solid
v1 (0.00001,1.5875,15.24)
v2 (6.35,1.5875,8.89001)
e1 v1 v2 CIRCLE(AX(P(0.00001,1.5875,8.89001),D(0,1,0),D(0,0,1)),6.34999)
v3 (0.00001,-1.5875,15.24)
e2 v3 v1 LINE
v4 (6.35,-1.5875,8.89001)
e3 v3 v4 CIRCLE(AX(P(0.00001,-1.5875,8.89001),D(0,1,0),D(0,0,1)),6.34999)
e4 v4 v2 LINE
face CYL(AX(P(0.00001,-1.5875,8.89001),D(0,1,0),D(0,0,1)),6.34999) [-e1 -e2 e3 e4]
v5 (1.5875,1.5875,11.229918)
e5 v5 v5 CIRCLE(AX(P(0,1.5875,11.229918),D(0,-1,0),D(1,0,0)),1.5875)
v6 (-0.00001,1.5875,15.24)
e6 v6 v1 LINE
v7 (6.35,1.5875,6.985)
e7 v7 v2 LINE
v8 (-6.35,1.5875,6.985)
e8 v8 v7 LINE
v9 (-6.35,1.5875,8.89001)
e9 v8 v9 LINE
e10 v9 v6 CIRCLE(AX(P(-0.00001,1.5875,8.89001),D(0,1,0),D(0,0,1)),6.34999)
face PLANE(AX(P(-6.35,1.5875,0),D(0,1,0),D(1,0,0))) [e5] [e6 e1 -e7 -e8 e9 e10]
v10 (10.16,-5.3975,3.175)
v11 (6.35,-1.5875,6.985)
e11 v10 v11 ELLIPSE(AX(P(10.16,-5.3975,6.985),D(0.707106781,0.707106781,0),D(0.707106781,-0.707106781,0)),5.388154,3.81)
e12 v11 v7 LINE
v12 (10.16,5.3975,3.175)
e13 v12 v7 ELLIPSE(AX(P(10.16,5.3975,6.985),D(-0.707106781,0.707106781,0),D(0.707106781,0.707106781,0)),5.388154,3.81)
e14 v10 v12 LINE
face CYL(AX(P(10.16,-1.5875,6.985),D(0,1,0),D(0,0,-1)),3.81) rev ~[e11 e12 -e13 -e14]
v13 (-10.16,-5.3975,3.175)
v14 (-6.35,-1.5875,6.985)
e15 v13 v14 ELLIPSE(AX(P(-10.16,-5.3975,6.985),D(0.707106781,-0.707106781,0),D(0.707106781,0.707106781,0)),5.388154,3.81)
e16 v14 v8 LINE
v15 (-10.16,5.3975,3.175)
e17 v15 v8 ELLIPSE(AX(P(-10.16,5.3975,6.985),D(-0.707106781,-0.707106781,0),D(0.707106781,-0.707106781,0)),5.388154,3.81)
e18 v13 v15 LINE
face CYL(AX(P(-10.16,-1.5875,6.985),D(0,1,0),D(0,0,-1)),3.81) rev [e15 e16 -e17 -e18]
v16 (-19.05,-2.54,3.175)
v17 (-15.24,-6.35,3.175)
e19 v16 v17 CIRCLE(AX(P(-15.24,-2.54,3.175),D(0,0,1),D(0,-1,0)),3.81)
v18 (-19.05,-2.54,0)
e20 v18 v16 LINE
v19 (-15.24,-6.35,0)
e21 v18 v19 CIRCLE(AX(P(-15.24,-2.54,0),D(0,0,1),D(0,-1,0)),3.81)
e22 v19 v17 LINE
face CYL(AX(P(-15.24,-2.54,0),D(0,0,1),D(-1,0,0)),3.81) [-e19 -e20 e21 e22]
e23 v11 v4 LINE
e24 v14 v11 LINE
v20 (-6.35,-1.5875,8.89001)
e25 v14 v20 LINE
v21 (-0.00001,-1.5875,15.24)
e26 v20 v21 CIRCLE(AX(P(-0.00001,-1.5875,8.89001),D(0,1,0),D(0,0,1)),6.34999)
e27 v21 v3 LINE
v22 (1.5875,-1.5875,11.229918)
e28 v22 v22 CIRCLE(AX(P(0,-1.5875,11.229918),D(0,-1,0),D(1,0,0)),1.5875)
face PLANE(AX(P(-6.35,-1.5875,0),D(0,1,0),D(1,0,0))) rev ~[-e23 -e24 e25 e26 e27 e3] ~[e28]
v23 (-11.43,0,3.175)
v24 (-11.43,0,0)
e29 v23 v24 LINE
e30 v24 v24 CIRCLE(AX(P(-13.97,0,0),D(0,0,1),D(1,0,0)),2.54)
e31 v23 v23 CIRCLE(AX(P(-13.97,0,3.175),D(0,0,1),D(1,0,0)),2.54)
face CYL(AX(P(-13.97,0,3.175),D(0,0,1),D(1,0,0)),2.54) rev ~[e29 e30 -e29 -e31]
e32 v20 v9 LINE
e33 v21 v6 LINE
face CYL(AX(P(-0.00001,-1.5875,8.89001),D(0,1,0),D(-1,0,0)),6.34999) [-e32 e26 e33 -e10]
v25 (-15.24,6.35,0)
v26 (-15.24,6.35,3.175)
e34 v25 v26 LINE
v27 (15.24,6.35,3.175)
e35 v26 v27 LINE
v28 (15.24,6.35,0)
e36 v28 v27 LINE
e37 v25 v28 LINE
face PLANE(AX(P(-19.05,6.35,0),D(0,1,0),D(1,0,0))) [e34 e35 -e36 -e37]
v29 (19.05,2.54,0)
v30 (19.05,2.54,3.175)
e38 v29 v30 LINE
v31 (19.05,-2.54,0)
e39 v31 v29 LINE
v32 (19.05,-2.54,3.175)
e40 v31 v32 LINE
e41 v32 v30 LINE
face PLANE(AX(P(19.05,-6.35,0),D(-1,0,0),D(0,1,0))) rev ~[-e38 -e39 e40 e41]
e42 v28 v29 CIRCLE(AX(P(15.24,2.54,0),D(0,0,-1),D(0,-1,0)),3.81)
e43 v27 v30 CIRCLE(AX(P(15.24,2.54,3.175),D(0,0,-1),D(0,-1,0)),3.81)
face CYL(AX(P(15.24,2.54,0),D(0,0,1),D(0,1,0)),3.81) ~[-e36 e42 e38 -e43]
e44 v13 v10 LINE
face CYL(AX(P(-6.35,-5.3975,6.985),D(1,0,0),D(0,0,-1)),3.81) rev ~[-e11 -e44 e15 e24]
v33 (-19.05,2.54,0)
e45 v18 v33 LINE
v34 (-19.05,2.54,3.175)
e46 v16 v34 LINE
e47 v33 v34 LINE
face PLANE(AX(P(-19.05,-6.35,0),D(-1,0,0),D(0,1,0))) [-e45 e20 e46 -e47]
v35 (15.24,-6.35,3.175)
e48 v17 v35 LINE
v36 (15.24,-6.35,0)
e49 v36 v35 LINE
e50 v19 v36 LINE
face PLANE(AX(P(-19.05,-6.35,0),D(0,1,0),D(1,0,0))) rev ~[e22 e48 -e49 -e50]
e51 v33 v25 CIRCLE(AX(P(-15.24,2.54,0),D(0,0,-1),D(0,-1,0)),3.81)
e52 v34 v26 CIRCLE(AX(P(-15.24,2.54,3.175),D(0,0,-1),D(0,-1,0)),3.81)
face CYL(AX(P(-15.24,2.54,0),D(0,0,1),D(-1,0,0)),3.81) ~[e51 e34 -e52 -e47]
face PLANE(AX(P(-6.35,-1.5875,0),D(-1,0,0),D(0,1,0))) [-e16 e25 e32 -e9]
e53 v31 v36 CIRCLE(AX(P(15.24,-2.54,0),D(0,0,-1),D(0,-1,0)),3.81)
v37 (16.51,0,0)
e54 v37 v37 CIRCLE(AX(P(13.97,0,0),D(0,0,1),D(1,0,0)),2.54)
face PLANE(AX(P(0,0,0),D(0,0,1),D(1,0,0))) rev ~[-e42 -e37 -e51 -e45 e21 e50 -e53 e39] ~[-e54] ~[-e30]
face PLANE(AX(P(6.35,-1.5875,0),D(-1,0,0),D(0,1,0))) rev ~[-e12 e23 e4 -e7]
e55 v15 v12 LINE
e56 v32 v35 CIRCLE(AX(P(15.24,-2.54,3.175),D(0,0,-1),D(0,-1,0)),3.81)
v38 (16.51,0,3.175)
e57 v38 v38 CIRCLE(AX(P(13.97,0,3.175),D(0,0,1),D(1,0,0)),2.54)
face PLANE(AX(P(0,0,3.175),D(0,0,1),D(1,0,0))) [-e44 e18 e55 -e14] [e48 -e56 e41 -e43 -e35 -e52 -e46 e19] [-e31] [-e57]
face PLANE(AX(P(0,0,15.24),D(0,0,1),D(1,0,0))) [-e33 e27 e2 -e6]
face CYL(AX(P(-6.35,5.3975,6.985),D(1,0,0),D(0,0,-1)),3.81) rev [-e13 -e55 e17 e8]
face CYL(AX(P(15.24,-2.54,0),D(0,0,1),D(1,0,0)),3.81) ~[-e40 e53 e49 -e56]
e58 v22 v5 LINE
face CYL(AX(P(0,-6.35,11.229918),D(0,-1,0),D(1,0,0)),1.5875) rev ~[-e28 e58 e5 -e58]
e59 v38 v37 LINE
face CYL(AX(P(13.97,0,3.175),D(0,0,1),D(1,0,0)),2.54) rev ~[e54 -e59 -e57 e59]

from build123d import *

# Parameters (mm, degrees)
F0_W     = 38.1
F0_H     = 12.7
F0_W_2   = 12.7
F0_H_2   = 3.175
F1_DEPTH = 3.175
F2_DEPTH = 15.24
F3_R     = 6.34999
F4_R     = 3.81
F5_R     = 1.5875
F6_DEPTH = 12.701
F7_R     = 2.54
F8_DEPTH = 3.176


# Not quite as in the source:
# - a fillet or chamfer is up to 0.001 mm smaller than in the source, because OpenCascade refuses the exact size


with BuildPart() as f1:
    # F0 (on Top) → F1 (new body)
    with BuildSketch(Plane.XY):
        Rectangle(F0_W, F0_H)
        Rectangle(F0_W_2, F0_H_2, mode=Mode.SUBTRACT)
    extrude(amount=F1_DEPTH)

    # F0 (on Top) → F2 (join)
    with BuildSketch(Plane.XY):
        Rectangle(F0_W_2, F0_H_2)
    extrude(amount=F2_DEPTH)

    # F3 (radius 6.35 in the source; OpenCascade refuses exactly that, so slightly less here)
    f3_edges = [f1.edges().sort_by_distance(p)[0] for p in [
        (-6.35, 0, 15.24),
        (6.35, 0, 15.24),
    ]]
    fillet(f3_edges, radius=F3_R)

    # F4 (call 1 of 5: OpenCascade refuses the feature's edges together)
    f4_edges = [f1.edges().sort_by_distance(p)[0] for p in [
        (-19.05, -6.35, 1.5875),
    ]]
    fillet(f4_edges, radius=F4_R)

    # F4#2 (call 2 of 5)
    f4_2_edges = [f1.edges().sort_by_distance(p)[0] for p in [
        (-19.05, 6.35, 1.5875),
    ]]
    fillet(f4_2_edges, radius=F4_R)

    # F4#3 (call 3 of 5)
    f4_3_edges = [f1.edges().sort_by_distance(p)[0] for p in [
        (19.05, 6.35, 1.5875),
    ]]
    fillet(f4_3_edges, radius=F4_R)

    # F4#4 (call 4 of 5)
    f4_4_edges = [f1.edges().sort_by_distance(p)[0] for p in [
        (19.05, -6.35, 1.5875),
    ]]
    fillet(f4_4_edges, radius=F4_R)

    # F4#5 (call 5 of 5)
    f4_5_edges = [f1.edges().sort_by_distance(p)[0] for p in [
        (0, -1.5875, 3.175),
        (0, 1.5875, 3.175),
        (6.35, 0, 3.175),
        (-6.35, 0, 3.175),
    ]]
    fillet(f4_5_edges, radius=F4_R)

    # F5 (on face) → F6 (cut, through all)
    with BuildSketch(Plane.XZ.offset(6.35)):
        with Locations((0, 11.2299183384)):
            Circle(F5_R)
    extrude(amount=-F6_DEPTH, mode=Mode.SUBTRACT)

    # F7 (on face) → F8 (cut, through all)
    with BuildSketch(Plane.XY.offset(3.175)):
        with Locations((-13.97, 0)):
            Circle(F7_R)
        with Locations((13.97, 0)):
            Circle(F7_R)
    extrude(amount=-F8_DEPTH, mode=Mode.SUBTRACT)


solid = f1.part
